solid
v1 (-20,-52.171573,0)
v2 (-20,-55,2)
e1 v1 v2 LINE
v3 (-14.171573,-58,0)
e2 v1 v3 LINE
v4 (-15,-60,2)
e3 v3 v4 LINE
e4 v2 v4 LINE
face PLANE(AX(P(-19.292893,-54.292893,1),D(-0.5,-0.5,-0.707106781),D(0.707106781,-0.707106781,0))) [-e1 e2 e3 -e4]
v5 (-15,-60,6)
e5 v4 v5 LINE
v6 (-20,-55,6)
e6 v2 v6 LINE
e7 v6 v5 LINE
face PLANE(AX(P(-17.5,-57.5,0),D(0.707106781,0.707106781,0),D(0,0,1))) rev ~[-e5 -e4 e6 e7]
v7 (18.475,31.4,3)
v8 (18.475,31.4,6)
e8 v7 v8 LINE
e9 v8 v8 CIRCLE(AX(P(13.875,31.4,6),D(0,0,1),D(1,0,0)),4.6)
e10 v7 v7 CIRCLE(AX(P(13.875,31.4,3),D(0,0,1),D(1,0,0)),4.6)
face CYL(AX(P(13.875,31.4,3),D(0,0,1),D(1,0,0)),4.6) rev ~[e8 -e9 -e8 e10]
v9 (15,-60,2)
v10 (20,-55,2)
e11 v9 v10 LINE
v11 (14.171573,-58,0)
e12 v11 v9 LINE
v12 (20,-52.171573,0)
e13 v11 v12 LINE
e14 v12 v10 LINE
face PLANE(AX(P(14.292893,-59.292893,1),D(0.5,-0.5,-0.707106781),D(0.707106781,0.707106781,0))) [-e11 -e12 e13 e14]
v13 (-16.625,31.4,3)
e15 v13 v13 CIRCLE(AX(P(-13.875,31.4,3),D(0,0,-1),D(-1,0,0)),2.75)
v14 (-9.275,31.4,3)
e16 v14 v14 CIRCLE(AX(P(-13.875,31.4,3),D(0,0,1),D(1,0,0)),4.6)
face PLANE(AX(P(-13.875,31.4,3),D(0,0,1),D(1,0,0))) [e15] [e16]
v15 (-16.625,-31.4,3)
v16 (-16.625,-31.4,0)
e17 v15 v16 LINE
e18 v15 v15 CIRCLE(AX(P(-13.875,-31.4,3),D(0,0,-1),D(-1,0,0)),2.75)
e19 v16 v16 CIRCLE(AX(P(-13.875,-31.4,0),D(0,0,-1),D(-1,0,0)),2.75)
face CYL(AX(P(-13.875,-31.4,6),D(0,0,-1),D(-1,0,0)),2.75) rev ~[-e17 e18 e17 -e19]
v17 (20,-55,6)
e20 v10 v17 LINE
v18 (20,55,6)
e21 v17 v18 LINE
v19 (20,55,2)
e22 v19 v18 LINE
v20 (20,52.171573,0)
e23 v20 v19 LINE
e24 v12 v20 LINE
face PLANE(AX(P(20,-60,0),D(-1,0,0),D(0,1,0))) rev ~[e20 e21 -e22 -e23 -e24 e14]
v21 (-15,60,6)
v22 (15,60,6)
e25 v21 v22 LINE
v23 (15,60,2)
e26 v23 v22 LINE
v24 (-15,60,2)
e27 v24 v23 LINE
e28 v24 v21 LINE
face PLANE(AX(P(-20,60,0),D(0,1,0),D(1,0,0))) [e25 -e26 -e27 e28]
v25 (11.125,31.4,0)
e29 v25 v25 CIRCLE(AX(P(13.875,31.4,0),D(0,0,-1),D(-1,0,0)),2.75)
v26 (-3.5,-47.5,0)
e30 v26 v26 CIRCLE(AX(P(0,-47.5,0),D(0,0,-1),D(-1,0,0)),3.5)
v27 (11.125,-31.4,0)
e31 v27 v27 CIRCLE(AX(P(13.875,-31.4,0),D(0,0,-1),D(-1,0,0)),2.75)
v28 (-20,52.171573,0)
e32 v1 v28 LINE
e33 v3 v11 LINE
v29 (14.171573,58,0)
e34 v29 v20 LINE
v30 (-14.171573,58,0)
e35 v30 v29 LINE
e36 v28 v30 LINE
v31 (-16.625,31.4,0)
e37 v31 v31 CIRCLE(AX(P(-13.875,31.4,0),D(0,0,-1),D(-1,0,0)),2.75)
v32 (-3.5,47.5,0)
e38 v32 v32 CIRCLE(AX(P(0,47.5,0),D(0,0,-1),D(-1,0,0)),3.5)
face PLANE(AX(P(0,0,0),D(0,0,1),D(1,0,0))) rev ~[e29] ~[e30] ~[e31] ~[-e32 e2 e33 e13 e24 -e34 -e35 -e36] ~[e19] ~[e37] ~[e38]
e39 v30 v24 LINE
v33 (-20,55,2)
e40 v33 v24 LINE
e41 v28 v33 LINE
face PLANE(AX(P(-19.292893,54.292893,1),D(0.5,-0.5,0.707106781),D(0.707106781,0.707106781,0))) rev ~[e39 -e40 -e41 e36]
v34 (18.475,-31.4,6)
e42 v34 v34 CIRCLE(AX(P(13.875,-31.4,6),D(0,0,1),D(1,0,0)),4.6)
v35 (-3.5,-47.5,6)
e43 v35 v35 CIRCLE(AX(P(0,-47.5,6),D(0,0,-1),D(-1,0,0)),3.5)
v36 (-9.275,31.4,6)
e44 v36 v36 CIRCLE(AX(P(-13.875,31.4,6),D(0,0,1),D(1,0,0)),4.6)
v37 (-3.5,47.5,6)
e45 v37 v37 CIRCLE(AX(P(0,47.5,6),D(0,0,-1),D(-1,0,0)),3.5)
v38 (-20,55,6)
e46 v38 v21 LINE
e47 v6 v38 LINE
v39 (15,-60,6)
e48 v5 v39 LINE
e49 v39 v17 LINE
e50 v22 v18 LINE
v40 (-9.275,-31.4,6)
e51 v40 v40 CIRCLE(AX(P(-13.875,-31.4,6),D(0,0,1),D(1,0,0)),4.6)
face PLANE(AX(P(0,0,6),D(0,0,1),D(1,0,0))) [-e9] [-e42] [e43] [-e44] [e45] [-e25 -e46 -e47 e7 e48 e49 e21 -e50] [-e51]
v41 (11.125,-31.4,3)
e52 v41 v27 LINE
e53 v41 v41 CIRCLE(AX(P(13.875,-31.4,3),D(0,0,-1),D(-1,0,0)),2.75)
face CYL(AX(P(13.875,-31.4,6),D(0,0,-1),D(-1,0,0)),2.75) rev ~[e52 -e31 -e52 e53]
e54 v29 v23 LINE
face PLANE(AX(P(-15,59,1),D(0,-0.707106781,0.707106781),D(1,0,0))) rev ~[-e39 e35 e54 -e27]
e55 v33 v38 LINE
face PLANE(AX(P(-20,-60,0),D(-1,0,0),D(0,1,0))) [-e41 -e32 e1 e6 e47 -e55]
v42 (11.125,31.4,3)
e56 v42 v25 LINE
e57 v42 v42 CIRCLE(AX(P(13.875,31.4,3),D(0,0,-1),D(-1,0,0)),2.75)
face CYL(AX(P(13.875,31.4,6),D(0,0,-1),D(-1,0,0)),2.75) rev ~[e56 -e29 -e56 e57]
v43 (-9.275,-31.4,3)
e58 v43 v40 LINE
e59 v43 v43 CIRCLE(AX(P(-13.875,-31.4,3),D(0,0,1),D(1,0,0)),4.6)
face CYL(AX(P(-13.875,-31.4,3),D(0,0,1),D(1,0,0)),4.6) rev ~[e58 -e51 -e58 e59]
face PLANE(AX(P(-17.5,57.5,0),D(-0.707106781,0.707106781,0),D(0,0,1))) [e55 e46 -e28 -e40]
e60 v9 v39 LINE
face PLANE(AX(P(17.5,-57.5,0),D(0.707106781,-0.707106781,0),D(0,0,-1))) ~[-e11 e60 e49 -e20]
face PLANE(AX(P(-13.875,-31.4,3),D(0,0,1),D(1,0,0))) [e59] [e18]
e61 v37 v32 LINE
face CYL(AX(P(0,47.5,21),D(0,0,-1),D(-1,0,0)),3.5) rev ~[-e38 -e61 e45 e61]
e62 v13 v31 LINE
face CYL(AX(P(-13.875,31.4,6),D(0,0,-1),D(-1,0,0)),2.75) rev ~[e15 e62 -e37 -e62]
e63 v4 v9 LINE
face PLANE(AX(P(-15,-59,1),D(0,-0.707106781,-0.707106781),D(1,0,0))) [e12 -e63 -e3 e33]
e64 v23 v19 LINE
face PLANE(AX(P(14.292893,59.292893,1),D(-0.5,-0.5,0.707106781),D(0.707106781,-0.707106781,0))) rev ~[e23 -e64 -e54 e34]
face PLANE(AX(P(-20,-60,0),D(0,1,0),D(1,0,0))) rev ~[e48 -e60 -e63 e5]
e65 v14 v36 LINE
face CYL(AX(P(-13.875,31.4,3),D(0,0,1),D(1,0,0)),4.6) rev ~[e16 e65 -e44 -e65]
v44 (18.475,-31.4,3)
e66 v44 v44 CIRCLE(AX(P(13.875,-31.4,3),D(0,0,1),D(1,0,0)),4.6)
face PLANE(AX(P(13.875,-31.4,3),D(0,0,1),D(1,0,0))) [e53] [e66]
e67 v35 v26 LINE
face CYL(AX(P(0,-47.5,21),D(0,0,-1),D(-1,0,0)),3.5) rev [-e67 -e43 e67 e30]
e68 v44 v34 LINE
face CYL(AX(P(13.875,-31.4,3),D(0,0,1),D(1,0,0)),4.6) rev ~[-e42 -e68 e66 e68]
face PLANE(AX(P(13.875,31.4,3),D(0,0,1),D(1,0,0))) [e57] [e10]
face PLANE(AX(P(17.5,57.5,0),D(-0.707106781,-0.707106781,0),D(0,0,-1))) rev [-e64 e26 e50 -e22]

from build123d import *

# Parameters (mm, degrees)
F0_W           = 40
F0_H           = 120
F1_DEPTH       = 6
F3_D           = 5.5
F3_DEPTH       = 15
F3_CBORE_D     = 9.2
F3_CBORE_DEPTH = 3
F3_TIP         = 1.6523667023
F5_D           = 7
F5_DEPTH       = 15
F5_TIP         = 2.1030121666
F6_SIZE        = 5
F7_SIZE        = 2


# Not quite as in the source:
# - a pattern or mirror of a feature is missing from the dataset's text; its kind, count and spacing are read off the source's solid


with BuildPart() as f1:
    # F0 (on Top) → F1 (new body)
    with BuildSketch(Plane.XY):
        Rectangle(F0_W, F0_H)
    extrude(amount=F1_DEPTH)

    # F3
    with Locations(Plane.XY.offset(6)):
        with Locations((-13.875, 31.4), (13.875, 31.4), (-13.875, -31.4), (13.875, -31.4)):
            CounterBoreHole(F3_D / 2, F3_CBORE_D / 2, F3_CBORE_DEPTH, depth=F3_DEPTH)
            with Locations((0, 0, -(F3_DEPTH + F3_TIP / 2))):  # 118° drill point
                Cone(0, F3_D / 2, F3_TIP, mode=Mode.SUBTRACT)

    # F5
    with Locations(Plane.XY.offset(6)):
        with Locations((0, 47.5)):
            f5 = Hole(F5_D / 2, depth=F5_DEPTH)
            with Locations((0, 0, -(F5_DEPTH + F5_TIP / 2))):  # 118° drill point
                Cone(0, F5_D / 2, F5_TIP, mode=Mode.SUBTRACT)

    # F5_copies: F5 across plane
    add(f5.mirror(Plane(origin=(0, 0, 0), x_dir=(0, 0, -1), z_dir=(0, -1, 0))), mode=Mode.SUBTRACT)

    # F6
    f6_edges = [f1.edges().sort_by_distance(p)[0] for p in [
        (20, 60, 3),
        (-20, 60, 3),
        (-20, -60, 3),
        (20, -60, 3),
    ]]
    chamfer(f6_edges, length=F6_SIZE)

    # F7
    f7_edges = [f1.edges().sort_by_distance(p)[0] for p in [
        (0, 60, 0),
        (-17.5, 57.5, 0),
        (17.5, 57.5, 0),
        (17.5, -57.5, 0),
        (0, -60, 0),
        (-17.5, -57.5, 0),
    ]]
    chamfer(f7_edges, length=F7_SIZE)


solid = f1.part
